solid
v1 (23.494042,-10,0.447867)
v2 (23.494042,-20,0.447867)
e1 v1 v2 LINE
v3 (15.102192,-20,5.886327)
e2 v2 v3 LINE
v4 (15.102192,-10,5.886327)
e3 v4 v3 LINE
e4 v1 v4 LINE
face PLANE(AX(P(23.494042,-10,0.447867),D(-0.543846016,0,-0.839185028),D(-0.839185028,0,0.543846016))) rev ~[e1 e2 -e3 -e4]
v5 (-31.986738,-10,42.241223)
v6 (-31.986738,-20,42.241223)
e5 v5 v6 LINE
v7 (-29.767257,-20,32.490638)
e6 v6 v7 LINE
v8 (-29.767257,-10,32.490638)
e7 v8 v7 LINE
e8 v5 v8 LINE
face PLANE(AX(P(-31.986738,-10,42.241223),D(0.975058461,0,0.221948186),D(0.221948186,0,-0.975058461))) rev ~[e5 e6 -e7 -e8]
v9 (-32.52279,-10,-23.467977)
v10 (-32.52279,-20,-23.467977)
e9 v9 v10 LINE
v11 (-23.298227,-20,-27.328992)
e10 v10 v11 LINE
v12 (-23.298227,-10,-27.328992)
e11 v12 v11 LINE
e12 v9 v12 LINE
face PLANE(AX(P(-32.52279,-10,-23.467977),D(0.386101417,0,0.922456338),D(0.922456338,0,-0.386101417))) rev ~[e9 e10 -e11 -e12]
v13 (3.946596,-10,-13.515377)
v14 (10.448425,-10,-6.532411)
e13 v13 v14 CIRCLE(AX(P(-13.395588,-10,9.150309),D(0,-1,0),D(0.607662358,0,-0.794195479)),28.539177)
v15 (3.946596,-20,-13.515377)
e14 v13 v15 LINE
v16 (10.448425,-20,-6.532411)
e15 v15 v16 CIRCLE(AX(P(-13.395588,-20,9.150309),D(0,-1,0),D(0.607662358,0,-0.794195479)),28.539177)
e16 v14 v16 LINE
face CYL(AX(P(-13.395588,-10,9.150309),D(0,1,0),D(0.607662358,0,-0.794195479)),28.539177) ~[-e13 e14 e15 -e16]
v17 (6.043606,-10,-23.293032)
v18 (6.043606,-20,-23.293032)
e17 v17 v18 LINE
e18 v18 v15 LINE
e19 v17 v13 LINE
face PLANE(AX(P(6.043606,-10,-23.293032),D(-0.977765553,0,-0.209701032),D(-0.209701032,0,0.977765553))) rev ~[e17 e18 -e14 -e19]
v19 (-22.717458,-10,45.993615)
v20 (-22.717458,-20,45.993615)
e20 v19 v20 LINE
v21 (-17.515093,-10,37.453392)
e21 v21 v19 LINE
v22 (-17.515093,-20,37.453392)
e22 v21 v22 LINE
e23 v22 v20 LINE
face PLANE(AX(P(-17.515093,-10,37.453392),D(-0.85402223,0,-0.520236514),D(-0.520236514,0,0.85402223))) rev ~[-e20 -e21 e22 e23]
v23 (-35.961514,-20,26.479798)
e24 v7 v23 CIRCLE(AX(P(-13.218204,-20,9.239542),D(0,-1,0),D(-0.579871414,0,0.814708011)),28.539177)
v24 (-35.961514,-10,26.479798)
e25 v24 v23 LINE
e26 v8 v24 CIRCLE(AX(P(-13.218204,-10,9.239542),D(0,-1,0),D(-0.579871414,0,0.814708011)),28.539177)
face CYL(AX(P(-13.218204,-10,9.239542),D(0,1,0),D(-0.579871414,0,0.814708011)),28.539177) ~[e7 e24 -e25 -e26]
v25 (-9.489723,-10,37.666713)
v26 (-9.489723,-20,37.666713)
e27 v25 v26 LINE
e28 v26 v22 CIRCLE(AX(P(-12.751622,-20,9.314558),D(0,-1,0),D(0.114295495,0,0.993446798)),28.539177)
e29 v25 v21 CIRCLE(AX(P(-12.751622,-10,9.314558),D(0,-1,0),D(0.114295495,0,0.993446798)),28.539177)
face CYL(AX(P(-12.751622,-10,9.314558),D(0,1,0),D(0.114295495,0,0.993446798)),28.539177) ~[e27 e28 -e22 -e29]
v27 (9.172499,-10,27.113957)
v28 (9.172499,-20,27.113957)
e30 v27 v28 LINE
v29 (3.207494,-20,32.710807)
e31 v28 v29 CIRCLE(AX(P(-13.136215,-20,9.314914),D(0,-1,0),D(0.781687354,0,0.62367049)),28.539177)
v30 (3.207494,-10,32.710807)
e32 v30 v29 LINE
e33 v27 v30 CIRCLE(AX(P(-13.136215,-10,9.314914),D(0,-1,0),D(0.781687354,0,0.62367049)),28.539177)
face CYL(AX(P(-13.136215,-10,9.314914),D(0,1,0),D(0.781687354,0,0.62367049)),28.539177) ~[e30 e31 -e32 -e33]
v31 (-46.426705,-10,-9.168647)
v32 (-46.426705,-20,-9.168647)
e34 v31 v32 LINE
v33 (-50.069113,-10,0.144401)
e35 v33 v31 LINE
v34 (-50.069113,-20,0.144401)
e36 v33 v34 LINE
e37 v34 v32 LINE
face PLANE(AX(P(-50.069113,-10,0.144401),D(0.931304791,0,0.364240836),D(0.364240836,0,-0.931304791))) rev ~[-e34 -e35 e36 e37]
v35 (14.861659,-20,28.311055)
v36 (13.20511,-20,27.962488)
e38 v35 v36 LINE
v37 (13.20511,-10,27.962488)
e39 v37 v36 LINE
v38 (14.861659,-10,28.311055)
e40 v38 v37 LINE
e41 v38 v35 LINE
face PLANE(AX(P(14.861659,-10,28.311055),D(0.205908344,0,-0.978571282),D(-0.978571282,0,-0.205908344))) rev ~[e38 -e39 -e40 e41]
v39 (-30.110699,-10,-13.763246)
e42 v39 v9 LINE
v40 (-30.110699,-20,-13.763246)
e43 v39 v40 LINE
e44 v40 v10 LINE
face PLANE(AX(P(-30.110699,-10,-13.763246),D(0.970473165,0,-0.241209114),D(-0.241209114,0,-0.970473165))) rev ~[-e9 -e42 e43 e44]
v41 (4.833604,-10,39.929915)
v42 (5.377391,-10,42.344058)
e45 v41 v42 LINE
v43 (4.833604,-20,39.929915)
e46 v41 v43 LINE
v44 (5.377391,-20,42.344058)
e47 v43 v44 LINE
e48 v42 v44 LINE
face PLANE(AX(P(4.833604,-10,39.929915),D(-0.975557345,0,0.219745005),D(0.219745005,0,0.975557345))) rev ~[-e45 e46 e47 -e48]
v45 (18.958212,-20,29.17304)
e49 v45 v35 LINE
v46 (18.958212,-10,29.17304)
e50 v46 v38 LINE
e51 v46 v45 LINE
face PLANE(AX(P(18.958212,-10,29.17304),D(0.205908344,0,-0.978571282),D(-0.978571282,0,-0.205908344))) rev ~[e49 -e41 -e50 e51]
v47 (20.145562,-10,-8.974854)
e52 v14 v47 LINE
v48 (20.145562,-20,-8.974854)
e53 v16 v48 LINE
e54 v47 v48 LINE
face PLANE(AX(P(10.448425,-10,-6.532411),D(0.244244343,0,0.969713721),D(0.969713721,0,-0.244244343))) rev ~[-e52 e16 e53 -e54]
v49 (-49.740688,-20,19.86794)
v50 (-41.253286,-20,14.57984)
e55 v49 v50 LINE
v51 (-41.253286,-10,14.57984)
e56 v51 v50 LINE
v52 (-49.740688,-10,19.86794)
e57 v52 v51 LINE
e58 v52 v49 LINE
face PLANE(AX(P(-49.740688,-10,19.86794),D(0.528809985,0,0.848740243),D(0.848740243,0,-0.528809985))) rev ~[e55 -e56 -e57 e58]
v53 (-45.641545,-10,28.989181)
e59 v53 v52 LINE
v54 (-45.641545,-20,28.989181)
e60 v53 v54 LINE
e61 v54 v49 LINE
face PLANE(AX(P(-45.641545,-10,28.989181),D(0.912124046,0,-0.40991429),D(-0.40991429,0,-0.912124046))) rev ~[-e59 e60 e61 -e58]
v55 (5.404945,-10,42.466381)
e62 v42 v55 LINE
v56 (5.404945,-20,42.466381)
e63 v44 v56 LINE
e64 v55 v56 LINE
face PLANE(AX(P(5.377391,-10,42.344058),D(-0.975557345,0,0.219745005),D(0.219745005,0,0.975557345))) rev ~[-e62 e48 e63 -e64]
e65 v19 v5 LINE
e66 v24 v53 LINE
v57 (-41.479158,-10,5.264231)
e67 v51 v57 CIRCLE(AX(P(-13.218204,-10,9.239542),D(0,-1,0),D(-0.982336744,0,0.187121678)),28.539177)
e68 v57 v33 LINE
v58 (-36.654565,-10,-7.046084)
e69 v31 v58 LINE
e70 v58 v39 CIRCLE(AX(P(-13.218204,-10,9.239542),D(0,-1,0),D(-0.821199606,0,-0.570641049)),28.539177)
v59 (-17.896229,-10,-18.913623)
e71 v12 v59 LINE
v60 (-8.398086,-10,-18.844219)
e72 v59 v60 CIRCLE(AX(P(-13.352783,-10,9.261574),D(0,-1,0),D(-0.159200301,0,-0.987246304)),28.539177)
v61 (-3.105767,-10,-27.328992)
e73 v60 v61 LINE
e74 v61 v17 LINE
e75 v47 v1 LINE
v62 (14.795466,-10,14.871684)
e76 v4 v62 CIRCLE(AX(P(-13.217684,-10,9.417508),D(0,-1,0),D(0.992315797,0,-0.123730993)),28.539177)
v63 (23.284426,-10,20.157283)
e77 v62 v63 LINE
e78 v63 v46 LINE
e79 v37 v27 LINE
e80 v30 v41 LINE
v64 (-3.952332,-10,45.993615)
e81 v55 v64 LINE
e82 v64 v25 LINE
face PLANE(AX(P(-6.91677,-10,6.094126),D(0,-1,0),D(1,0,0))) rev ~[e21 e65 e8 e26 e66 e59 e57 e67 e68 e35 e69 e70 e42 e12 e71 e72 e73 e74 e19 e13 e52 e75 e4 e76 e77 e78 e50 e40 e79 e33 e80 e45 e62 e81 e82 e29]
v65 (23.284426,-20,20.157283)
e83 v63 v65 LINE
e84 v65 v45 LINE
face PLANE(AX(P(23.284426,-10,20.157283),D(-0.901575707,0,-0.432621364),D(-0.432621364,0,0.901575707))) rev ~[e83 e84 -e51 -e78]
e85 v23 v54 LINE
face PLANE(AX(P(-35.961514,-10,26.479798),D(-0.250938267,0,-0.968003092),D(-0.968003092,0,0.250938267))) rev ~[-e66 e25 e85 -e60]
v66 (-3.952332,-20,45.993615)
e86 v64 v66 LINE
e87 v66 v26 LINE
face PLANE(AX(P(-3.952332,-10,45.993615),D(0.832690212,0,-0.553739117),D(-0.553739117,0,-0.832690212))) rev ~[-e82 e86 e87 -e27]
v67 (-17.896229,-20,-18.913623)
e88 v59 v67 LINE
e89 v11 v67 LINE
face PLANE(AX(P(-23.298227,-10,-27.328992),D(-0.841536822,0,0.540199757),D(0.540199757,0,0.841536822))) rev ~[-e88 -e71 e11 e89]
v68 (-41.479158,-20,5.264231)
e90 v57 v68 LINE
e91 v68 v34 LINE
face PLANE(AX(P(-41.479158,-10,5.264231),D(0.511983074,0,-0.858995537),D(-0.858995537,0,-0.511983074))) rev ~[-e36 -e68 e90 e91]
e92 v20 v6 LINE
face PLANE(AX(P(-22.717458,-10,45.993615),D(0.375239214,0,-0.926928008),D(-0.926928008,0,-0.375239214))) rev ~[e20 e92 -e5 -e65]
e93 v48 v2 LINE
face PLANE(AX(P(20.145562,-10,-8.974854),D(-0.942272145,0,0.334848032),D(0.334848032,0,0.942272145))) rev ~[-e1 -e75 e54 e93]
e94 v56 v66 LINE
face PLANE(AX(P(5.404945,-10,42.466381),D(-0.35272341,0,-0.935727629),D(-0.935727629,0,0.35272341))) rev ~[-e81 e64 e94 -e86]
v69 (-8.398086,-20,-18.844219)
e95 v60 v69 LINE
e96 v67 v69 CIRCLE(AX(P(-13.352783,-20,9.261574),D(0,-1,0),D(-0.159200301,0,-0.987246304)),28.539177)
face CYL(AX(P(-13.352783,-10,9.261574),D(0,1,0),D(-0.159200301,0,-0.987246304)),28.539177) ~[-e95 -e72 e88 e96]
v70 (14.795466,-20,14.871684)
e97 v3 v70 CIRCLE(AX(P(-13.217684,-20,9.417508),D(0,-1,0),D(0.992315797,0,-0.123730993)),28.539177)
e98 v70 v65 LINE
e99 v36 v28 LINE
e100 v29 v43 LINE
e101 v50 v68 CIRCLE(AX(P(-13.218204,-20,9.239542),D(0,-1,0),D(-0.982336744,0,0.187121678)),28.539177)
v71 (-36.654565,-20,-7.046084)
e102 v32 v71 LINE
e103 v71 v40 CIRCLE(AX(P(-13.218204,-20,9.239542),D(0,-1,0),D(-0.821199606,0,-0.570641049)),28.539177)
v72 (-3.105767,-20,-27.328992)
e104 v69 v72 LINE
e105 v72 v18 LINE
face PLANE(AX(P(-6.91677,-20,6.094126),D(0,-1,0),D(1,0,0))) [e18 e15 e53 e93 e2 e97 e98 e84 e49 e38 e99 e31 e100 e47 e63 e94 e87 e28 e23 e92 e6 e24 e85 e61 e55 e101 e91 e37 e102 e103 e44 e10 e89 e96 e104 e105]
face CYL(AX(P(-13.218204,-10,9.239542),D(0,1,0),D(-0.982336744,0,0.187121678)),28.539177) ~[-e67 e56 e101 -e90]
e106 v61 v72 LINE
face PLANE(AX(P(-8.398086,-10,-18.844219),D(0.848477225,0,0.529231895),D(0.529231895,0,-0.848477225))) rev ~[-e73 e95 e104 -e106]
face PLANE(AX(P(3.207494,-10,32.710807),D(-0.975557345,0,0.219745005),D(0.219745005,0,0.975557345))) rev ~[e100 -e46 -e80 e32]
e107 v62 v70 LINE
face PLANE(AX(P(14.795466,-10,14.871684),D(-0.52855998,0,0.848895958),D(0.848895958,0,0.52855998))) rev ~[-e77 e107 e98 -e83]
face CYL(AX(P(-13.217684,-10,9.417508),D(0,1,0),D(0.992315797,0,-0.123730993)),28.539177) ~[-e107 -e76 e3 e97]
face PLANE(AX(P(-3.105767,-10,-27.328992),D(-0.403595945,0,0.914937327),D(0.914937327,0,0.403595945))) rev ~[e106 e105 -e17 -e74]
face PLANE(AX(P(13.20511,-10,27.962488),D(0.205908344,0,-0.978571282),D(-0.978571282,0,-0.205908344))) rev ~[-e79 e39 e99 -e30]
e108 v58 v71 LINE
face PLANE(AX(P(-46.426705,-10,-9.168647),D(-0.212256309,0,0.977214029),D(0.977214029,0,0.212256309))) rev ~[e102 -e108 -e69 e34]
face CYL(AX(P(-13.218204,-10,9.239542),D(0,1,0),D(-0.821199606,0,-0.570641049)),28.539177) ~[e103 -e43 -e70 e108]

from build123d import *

# Parameters (mm, degrees)
F0_R     = 10.5352835121
F1_DEPTH = 10
F2_R     = 10.5352835121
F4_DEPTH = 10


with BuildPart() as f1:
    # F0 (on Front) → F1 (new body)
    with BuildSketch(Plane.XZ):
        with BuildLine():
            ThreePointArc((27.7799711237, -2.671018116), (28.1744534053, 0.0443174404), (28.3063539053, 2.7849862844))
            ThreePointArc((28.3063539053, 2.7849862844), (28.0187327637, 6.8265473039), (27.1616666974, 10.7866456806))
            ThreePointArc((27.1616666974, 10.7866456806), (25.7257105116, 14.6441244213), (23.7497903046, 18.2549209731))
            ThreePointArc((23.7497903046, 18.2549209731), (19.361792777, 23.5343393933), (13.840033917, 27.6131823971))
            ThreePointArc((13.840033917, 27.6131823971), (10.2093532061, 29.3452118388), (6.3712126192, 30.5495561611))
            ThreePointArc((6.3712126192, 30.5495561611), (-0.2384881302, 31.3241628205), (-6.8478808449, 30.5469322125))
            ThreePointArc((-6.8478808449, 30.5469322125), (-10.969919952, 29.2273648204), (-14.8450148239, 27.2996448624))
            ThreePointArc((-14.8450148239, 27.2996448624), (-20.0530528407, 23.3189368581), (-24.2154366907, 18.2549209731))
            ThreePointArc((-24.2154366907, 18.2549209731), (-26.4192319908, 14.132083875), (-27.9203856002, 9.7047780009))
            ThreePointArc((-27.9203856002, 9.7047780009), (-28.7702301145, 3.1028473381), (-28.0676480896, -3.5163748724))
            ThreePointArc((-28.0676480896, -3.5163748724), (-26.6541111331, -8.0039049024), (-24.5224980596, -12.1982151202))
            ThreePointArc((-24.5224980596, -12.1982151202), (-20.3786644673, -17.4296051981), (-15.133187526, -21.555592431))
            ThreePointArc((-15.133187526, -21.555592431), (-10.8750457734, -23.6957185401), (-6.3201455519, -25.0974299658))
            ThreePointArc((-6.3201455519, -25.0974299658), (0.4193178956, -25.7467388904), (7.122076621, -24.7901851235))
            ThreePointArc((7.122076621, -24.7901851235), (11.5833738131, -23.1931221487), (15.7189210631, -20.8798924315))
            ThreePointArc((15.7189210631, -20.8798924315), (20.7808637814, -16.5258808424), (24.6926258312, -11.1148921464))
            ThreePointArc((24.6926258312, -11.1148921464), (26.5708921122, -7.0152930628), (27.7799711237, -2.671018116))
        make_face()
        with Locations((-0.2328231931, 2.7849862844)):
            Circle(F0_R, mode=Mode.SUBTRACT)
        with BuildLine():
            ThreePointArc((-24.2154366907, 18.2549209731), (-20.0530528407, 23.3189368581), (-14.8450148239, 27.2996448624))
            Line((-14.8450148239, 27.2996448624), (-22.8760878199, 33.2579891401))
            Line((-22.8760878199, 33.2579891401), (-30.0983452841, 26.3414150516))
            Line((-30.0983452841, 26.3414150516), (-24.2154366907, 18.2549209731))
        make_face()
        with BuildLine():
            ThreePointArc((-28.0676480896, -3.5163748724), (-28.7702301145, 3.1028473381), (-27.9203856002, 9.7047780009))
            Line((-27.9203856002, 9.7047780009), (-37.8038170807, 8.1823515919))
            Line((-37.8038170807, 8.1823515919), (-37.9221875331, -1.8169478053))
            Line((-37.9221875331, -1.8169478053), (-28.0676480896, -3.5163748724))
        make_face()
        with BuildLine():
            Line((-23.298226533, -27.3289916042), (-15.133187526, -21.555592431))
            ThreePointArc((-15.133187526, -21.555592431), (-20.3786644673, -17.4296051981), (-24.5224980596, -12.1982151202))
            Line((-24.5224980596, -12.1982151202), (-30.3999287678, -20.2886915134))
            Line((-30.3999287678, -20.2886915134), (-23.298226533, -27.3289916042))
        make_face()
        with BuildLine():
            Line((5.3968944368, -34.640248394), (7.122076621, -24.7901851235))
            ThreePointArc((7.122076621, -24.7901851235), (0.4193178956, -25.7467388904), (-6.3201455519, -25.0974299658))
            Line((-6.3201455519, -25.0974299658), (-4.5983661602, -34.9480886101))
            Line((-4.5983661602, -34.9480886101), (5.3968944368, -34.640248394))
        make_face()
        with BuildLine():
            Line((30.4305433725, -19.3049044961), (24.6926258312, -11.1148921464))
            ThreePointArc((24.6926258312, -11.1148921464), (20.7808637814, -16.5258808424), (15.7189210631, -20.8798924315))
            Line((15.7189210631, -20.8798924315), (23.7909685899, -26.7826078003))
            Line((23.7909685899, -26.7826078003), (30.4305433725, -19.3049044961))
        make_face()
        with BuildLine():
            ThreePointArc((27.1616666974, 10.7866456806), (28.0187327637, 6.8265473039), (28.3063539053, 2.7849862844))
            ThreePointArc((28.3063539053, 2.7849862844), (28.1744534053, 0.0443174404), (27.7799711237, -2.671018116))
            Line((27.7799711237, -2.671018116), (37.6319898333, -0.9570381434))
            Line((37.6319898333, -0.9570381434), (37.004966841, 9.0232846052))
            Line((37.004966841, 9.0232846052), (27.1616666974, 10.7866456806))
        make_face()
        with BuildLine():
            ThreePointArc((13.840033917, 27.6131823971), (19.361792777, 23.5343393933), (23.7497903046, 18.2549209731))
            Line((23.7497903046, 18.2549209731), (29.4473420196, 26.4730658036))
            Line((29.4473420196, 26.4730658036), (22.097377097, 33.2537748843))
            Line((22.097377097, 33.2537748843), (13.840033917, 27.6131823971))
        make_face()
        with BuildLine():
            ThreePointArc((-6.8478808449, 30.5469322125), (-0.2384881302, 31.3241628205), (6.3712126192, 30.5495561611))
            Line((6.3712126192, 30.5495561611), (4.7536209633, 40.4178588133))
            Line((4.7536209633, 40.4178588133), (-5.2463790367, 40.4178588133))
            Line((-5.2463790367, 40.4178588133), (-6.8478808449, 30.5469322125))
        make_face()
    extrude(amount=F1_DEPTH)


with BuildPart() as f4:
    # F2 (on face) → F4 (new body)
    with BuildSketch(Plane.XZ.offset(10)):
        with BuildLine():
            Line((6.0436061547, -23.2930321543), (3.9465958394, -13.5153766205))
            ThreePointArc((3.9465958394, -13.5153766205), (7.4913970999, -10.2975314551), (10.4484246026, -6.5324110277))
            Line((10.4484246026, -6.5324110277), (20.145561814, -8.9748544564))
            Line((20.145561814, -8.9748544564), (23.4940421304, 0.4478669961))
            Line((23.4940421304, 0.4478669961), (15.1021918552, 5.8863271605))
            ThreePointArc((15.1021918552, 5.8863271605), (15.3048791393, 10.3911595364), (14.795466022, 14.8716835175))
            Line((14.795466022, 14.8716835175), (23.2844256021, 20.1572833176))
            Line((23.2844256021, 20.1572833176), (18.9582119637, 29.1730403882))
            Line((18.9582119637, 29.1730403882), (14.8616590906, 28.3110547216))
            Line((14.8616590906, 28.3110547216), (13.840033917, 27.6131823971))
            ThreePointArc((13.840033917, 27.6131823971), (13.5236804737, 27.7898505375), (13.2051095461, 27.9624880101))
            Line((13.2051095461, 27.9624880101), (9.1724991444, 27.1139569468))
            ThreePointArc((9.1724991444, 27.1139569468), (6.3915510384, 30.1271942866), (3.2074944908, 32.7108071709))
            Line((3.2074944908, 32.7108071709), (4.8336037454, 39.9299147155))
            Line((4.8336037454, 39.9299147155), (4.7536209633, 40.4178588133))
            Line((4.7536209633, 40.4178588133), (-5.2463790367, 40.4178588133))
            Line((-5.2463790367, 40.4178588133), (-6.8478808449, 30.5469322125))
            ThreePointArc((-6.8478808449, 30.5469322125), (-10.969919952, 29.2273648204), (-14.8450148239, 27.2996448624))
            Line((-14.8450148239, 27.2996448624), (-22.8760878199, 33.2579891401))
            Line((-22.8760878199, 33.2579891401), (-30.0983452841, 26.3414150516))
            Line((-30.0983452841, 26.3414150516), (-24.2154366907, 18.2549209731))
            ThreePointArc((-24.2154366907, 18.2549209731), (-26.4192319908, 14.132083875), (-27.9203856002, 9.7047780009))
            Line((-27.9203856002, 9.7047780009), (-37.8038170807, 8.1823515919))
            Line((-37.8038170807, 8.1823515919), (-37.9221875331, -1.8169478053))
            Line((-37.9221875331, -1.8169478053), (-28.0676480896, -3.5163748724))
            ThreePointArc((-28.0676480896, -3.5163748724), (-26.6541111331, -8.0039049024), (-24.5224980596, -12.1982151202))
            Line((-24.5224980596, -12.1982151202), (-30.3999287678, -20.2886915134))
            Line((-30.3999287678, -20.2886915134), (-23.298226533, -27.3289916042))
            Line((-23.298226533, -27.3289916042), (-17.896228959, -18.9136233882))
            ThreePointArc((-17.896228959, -18.9136233882), (-13.1442498661, -19.2768415054), (-8.3980860704, -18.8442193547))
            Line((-8.3980860704, -18.8442193547), (-3.10576712, -27.3289916042))
            Line((-3.10576712, -27.3289916042), (6.0436061547, -23.2930321543))
        make_face()
        with Locations((-0.2328231931, 2.7849862844)):
            Circle(F2_R, mode=Mode.SUBTRACT)
        with BuildLine():
            Line((-32.5227899129, -23.4679774305), (-23.298226533, -27.3289916042))
            Line((-23.298226533, -27.3289916042), (-30.3999287678, -20.2886915134))
            Line((-30.3999287678, -20.2886915134), (-24.5224980596, -12.1982151202))
            ThreePointArc((-24.5224980596, -12.1982151202), (-26.6541111331, -8.0039049024), (-28.0676480896, -3.5163748724))
            Line((-28.0676480896, -3.5163748724), (-37.9221875331, -1.8169478053))
            Line((-37.9221875331, -1.8169478053), (-37.8038170807, 8.1823515919))
            Line((-37.8038170807, 8.1823515919), (-27.9203856002, 9.7047780009))
            ThreePointArc((-27.9203856002, 9.7047780009), (-26.4192319908, 14.132083875), (-24.2154366907, 18.2549209731))
            Line((-24.2154366907, 18.2549209731), (-30.0983452841, 26.3414150516))
            Line((-30.0983452841, 26.3414150516), (-22.8760878199, 33.2579891401))
            Line((-22.8760878199, 33.2579891401), (-14.8450148239, 27.2996448624))
            ThreePointArc((-14.8450148239, 27.2996448624), (-10.969919952, 29.2273648204), (-6.8478808449, 30.5469322125))
            Line((-6.8478808449, 30.5469322125), (-5.2463790367, 40.4178588133))
            Line((-5.2463790367, 40.4178588133), (4.7536209633, 40.4178588133))
            Line((4.7536209633, 40.4178588133), (4.8336037454, 39.9299147155))
            Line((4.8336037454, 39.9299147155), (5.3773912439, 42.3440578129))
            Line((5.3773912439, 42.3440578129), (5.4049445449, 42.4663806169))
            Line((5.4049445449, 42.4663806169), (-3.952331747, 45.9936147169))
            Line((-3.952331747, 45.9936147169), (-9.4897229207, 37.6667125925))
            ThreePointArc((-9.4897229207, 37.6667125925), (-13.5099465153, 37.8436589686), (-17.5150931781, 37.4533924182))
            Line((-17.5150931781, 37.4533924182), (-22.7174583218, 45.9936147169))
            Line((-22.7174583218, 45.9936147169), (-31.9867384026, 42.2412225755))
            Line((-31.9867384026, 42.2412225755), (-29.767256543, 32.4906379635))
            ThreePointArc((-29.767256543, 32.4906379635), (-33.0929366105, 29.720743274), (-35.9615144592, 26.4797980987))
            Line((-35.9615144592, 26.4797980987), (-45.6415453785, 28.9891807718))
            Line((-45.6415453785, 28.9891807718), (-49.7406882781, 19.867940314))
            Line((-49.7406882781, 19.867940314), (-41.2532858507, 14.5798404628))
            ThreePointArc((-41.2532858507, 14.5798404628), (-41.7489952856, 9.9313168673), (-41.4791578337, 5.2642313516))
            Line((-41.4791578337, 5.2642313516), (-50.0691131996, 0.1444006111))
            Line((-50.0691131996, 0.1444006111), (-46.4267048395, -9.168647297))
            Line((-46.4267048395, -9.168647297), (-36.6545645454, -7.0460842067))
            ThreePointArc((-36.6545645454, -7.0460842067), (-33.660420308, -10.6752869818), (-30.1106987778, -13.7632457827))
            Line((-30.1106987778, -13.7632457827), (-32.5227899129, -23.4679774305))
        make_face()
        with BuildLine():
            Line((13.840033917, 27.6131823971), (14.8616590906, 28.3110547216))
            Line((14.8616590906, 28.3110547216), (13.2051095461, 27.9624880101))
            ThreePointArc((13.2051095461, 27.9624880101), (13.5236804737, 27.7898505375), (13.840033917, 27.6131823971))
        make_face()
        with Locations((-0.2328231931, 2.7849862844)):
            Circle(F2_R)
    extrude(amount=F4_DEPTH)


solid = f4.part
